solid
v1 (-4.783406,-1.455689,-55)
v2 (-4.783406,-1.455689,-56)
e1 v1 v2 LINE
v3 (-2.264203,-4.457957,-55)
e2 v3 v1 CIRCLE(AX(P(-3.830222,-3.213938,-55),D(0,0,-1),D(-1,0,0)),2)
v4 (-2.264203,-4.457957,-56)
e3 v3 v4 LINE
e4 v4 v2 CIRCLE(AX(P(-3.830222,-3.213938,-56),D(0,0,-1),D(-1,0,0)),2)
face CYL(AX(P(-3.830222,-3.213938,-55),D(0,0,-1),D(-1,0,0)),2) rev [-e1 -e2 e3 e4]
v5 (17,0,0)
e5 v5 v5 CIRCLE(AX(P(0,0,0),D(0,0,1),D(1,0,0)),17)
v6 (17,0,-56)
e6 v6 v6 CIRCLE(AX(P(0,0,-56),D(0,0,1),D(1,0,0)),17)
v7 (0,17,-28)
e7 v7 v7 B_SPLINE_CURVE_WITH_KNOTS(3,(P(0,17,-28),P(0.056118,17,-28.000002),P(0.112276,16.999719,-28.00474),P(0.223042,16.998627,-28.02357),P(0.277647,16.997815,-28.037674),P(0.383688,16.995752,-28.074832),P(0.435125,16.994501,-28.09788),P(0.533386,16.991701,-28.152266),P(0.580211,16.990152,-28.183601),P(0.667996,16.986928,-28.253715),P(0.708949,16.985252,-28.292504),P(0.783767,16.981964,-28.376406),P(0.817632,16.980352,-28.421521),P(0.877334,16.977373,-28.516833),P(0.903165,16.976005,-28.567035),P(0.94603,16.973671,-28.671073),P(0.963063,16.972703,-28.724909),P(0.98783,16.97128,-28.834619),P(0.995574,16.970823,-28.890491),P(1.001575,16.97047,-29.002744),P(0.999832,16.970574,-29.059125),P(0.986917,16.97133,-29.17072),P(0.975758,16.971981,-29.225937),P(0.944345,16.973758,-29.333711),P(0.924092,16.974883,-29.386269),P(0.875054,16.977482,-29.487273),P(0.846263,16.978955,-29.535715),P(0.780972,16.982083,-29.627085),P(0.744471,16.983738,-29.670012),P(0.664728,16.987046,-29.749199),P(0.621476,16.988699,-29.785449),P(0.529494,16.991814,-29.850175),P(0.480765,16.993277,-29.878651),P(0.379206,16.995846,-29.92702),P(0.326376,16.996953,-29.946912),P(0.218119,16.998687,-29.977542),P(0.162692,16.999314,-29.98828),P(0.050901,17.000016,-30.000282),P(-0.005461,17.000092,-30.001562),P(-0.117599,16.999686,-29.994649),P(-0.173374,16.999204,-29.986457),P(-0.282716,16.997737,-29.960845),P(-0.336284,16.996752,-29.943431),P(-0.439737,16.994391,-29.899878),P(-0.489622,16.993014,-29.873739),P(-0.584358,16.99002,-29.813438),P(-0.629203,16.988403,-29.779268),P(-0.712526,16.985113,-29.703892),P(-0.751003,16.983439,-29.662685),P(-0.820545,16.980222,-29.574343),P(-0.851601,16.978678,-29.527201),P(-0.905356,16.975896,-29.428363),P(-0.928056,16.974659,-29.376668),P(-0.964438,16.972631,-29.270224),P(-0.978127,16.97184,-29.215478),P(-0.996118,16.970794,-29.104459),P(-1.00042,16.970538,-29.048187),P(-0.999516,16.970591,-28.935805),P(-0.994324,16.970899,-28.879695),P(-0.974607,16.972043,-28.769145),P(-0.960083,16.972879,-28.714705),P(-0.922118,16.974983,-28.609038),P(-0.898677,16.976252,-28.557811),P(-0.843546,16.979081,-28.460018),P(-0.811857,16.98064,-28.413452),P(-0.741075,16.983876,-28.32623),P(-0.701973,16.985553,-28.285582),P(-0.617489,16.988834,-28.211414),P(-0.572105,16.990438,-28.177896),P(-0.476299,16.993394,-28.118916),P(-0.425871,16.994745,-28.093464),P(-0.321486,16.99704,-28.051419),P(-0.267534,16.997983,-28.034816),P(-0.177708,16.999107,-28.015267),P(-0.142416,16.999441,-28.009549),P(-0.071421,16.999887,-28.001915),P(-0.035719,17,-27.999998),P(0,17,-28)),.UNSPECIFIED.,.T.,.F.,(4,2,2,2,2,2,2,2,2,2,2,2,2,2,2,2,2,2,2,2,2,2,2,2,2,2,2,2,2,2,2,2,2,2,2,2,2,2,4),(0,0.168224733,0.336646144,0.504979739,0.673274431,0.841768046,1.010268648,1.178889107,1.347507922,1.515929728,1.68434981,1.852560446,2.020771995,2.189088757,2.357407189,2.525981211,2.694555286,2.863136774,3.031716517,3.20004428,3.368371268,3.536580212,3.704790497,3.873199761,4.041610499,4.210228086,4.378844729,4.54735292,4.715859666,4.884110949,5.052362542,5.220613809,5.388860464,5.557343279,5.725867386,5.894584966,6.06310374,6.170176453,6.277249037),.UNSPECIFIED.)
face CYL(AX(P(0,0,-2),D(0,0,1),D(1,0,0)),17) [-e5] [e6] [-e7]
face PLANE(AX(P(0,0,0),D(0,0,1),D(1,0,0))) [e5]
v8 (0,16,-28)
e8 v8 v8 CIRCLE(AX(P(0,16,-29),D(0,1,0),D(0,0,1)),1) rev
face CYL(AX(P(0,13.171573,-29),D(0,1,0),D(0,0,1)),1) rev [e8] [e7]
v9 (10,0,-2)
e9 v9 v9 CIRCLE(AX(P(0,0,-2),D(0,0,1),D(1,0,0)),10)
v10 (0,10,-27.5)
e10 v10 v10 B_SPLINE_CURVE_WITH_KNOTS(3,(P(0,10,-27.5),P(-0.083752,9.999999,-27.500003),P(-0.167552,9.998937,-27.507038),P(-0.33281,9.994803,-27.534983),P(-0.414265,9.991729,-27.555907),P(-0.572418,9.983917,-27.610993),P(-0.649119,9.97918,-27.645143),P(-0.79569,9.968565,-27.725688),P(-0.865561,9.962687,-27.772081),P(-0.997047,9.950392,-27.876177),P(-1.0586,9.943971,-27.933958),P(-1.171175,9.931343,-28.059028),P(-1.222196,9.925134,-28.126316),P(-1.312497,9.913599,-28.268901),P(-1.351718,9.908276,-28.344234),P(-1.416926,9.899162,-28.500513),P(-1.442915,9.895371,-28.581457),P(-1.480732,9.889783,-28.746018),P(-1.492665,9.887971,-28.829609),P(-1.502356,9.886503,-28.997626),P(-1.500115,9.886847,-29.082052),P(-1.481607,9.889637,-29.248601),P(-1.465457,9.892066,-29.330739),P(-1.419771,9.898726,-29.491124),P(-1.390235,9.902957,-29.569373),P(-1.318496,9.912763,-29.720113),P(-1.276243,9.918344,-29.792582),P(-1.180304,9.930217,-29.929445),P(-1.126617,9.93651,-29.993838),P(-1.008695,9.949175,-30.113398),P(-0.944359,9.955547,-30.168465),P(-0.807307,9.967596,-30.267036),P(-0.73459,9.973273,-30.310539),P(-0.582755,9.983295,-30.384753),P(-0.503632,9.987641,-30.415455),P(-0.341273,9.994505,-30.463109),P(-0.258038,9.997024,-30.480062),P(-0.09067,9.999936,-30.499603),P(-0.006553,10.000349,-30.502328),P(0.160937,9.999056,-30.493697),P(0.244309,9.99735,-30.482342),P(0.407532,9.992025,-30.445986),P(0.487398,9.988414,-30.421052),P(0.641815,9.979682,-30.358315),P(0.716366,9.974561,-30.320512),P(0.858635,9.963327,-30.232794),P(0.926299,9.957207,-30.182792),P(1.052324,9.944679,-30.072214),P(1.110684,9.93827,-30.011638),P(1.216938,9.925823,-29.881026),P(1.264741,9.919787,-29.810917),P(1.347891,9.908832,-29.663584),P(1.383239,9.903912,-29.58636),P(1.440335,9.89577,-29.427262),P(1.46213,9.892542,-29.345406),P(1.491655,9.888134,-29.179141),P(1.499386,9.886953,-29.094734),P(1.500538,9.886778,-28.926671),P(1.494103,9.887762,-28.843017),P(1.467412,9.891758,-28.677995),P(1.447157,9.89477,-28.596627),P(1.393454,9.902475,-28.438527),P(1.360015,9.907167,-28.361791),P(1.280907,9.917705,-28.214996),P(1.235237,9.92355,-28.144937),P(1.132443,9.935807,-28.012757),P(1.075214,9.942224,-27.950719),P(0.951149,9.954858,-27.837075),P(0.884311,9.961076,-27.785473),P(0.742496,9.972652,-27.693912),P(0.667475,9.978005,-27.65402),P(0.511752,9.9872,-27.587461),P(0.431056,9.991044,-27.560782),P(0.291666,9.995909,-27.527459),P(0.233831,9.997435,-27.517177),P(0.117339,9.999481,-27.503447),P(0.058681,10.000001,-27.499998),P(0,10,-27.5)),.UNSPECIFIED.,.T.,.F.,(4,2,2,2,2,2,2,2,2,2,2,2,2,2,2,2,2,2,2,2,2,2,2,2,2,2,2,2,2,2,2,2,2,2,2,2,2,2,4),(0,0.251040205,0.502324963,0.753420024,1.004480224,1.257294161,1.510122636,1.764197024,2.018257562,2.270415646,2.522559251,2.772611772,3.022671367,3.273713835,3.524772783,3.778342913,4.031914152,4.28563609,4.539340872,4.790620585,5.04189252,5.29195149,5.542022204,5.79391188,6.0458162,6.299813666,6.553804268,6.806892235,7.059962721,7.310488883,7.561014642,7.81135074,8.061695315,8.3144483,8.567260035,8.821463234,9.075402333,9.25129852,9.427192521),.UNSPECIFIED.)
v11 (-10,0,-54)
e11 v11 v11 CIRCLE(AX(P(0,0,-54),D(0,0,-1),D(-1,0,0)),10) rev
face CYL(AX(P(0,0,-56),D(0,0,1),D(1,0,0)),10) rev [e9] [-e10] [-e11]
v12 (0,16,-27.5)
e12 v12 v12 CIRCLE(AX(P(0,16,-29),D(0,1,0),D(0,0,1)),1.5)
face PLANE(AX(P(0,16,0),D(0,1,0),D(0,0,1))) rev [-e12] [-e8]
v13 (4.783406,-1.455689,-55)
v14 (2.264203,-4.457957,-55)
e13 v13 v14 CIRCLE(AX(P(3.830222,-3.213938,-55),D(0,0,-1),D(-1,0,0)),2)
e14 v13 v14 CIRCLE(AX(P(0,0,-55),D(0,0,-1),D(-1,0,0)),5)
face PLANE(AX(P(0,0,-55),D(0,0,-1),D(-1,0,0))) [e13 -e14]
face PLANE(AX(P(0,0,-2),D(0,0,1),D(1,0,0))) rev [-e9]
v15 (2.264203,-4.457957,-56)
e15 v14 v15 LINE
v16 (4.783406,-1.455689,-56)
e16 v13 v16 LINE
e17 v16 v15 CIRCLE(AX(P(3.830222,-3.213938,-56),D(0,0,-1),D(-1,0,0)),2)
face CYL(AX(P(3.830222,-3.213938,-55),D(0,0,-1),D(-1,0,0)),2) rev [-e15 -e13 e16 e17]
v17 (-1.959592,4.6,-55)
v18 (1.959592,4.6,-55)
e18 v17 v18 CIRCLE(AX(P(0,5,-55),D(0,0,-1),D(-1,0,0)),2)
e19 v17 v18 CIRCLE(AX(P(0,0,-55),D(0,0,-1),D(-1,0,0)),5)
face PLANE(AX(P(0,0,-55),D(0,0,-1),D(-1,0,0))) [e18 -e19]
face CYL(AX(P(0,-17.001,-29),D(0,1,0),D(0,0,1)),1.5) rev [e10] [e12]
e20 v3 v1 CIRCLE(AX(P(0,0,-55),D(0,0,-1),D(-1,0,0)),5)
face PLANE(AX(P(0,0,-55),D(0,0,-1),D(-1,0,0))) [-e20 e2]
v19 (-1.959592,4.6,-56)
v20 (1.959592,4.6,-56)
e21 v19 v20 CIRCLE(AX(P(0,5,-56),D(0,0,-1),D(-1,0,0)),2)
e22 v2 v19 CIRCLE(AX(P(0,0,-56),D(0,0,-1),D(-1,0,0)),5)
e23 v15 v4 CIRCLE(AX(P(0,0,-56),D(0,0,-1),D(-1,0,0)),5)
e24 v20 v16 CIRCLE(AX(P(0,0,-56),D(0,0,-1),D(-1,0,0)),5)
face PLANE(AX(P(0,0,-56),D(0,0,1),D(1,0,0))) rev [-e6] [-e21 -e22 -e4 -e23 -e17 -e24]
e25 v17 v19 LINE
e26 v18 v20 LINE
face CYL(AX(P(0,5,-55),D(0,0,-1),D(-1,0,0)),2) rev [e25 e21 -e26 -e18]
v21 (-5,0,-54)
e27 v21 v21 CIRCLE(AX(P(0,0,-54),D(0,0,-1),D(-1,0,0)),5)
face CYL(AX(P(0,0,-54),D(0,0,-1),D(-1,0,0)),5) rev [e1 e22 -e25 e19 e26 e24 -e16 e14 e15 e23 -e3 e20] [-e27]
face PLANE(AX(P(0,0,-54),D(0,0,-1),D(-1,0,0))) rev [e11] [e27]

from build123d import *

# Parameters (mm, degrees)
FACE_2_R                      = 17
BOSS_EXTRUDE5_DEPTH           = 2
BOSS_EXTRUDE6_START           = -56
BOSS_EXTRUDE6_OUTLINE_R       = 17
BOSS_EXTRUDE6_OUTLINE_R_2     = 10
BOSS_EXTRUDE6_DEPTH           = 54
DRIVER_PIN_BODY_CUT_START     = 9.886859906
DRIVER_PIN_BODY_CUT_OUTLINE_R = 1.5
DRIVER_PIN_BODY_CUT_DEPTH     = 6.113140094
SKETCH5_R                     = 10
SKETCH5_R_2                   = 5
BOSS_EXTRUDE7_DEPTH           = 2
DRIVER_PIN_SKETCH_R           = 1
DRIVER_PIN_SKETCH_R_2         = 0.15
DRIVER_PIN_NECK_EXTRUDE_DEPTH = 1
SKETCH5_6_R                   = 5
SKETCH5_6_R_2                 = 2
CUT_EXTRUDE1_DEPTH            = 1


# Read off the part's stored shape, not the designer's step: Boss-Extrude6, driver_pin_body_cut
with BuildPart() as part:
    # face 2 → Boss-Extrude5 (new body)
    with BuildSketch(Plane.XY):
        Circle(FACE_2_R)
    extrude(amount=-BOSS_EXTRUDE5_DEPTH)

    # Boss-Extrude6 outline → Boss-Extrude6 (add)
    with BuildSketch(Plane.XY.offset(BOSS_EXTRUDE6_START)):
        Circle(BOSS_EXTRUDE6_OUTLINE_R)
        Circle(BOSS_EXTRUDE6_OUTLINE_R_2, mode=Mode.SUBTRACT)
    extrude(amount=BOSS_EXTRUDE6_DEPTH)

    # driver_pin_body_cut outline → driver_pin_body_cut (cut)
    with BuildSketch(Plane(origin=(0, 0, 0), x_dir=(1, 0, 0), z_dir=(0, 1, 0)).offset(DRIVER_PIN_BODY_CUT_START)):
        with Locations((0, 29)):
            Circle(DRIVER_PIN_BODY_CUT_OUTLINE_R)
    extrude(amount=DRIVER_PIN_BODY_CUT_DEPTH, mode=Mode.SUBTRACT)

    # Sketch5 → Boss-Extrude7 (add)
    with BuildSketch(Plane(origin=(0, 0, -56), x_dir=(-1, 0, 0), z_dir=(0, 0, -1))):
        with Locations(Location((0, 0, 0), (0, 0, 180))):
            Circle(SKETCH5_R)
        Circle(SKETCH5_R_2, mode=Mode.SUBTRACT)
    extrude(amount=-BOSS_EXTRUDE7_DEPTH)

    # driver_pin_sketch → driver_pin_neck_extrude (cut)
    # profile 1 of 2: a face of its own
    with BuildSketch(Plane(origin=(0, 17, 0), x_dir=(1, 0, 0), z_dir=(0, 1, 0))):
        with Locations(Location((0, 29, 0), (0, 0, 270))):
            Circle(DRIVER_PIN_SKETCH_R)
        with Locations((0, 29)):
            Circle(DRIVER_PIN_SKETCH_R_2, mode=Mode.SUBTRACT)
    # profile 2 of 2: a face of its own
    with BuildSketch(Plane(origin=(0, 17, 0), x_dir=(1, 0, 0), z_dir=(0, 1, 0))):
        with Locations((0, 29)):
            Circle(DRIVER_PIN_SKETCH_R_2)
    extrude(amount=-DRIVER_PIN_NECK_EXTRUDE_DEPTH, mode=Mode.SUBTRACT)

    # Sketch5<6> → Cut-Extrude1 (cut)
    with BuildSketch(Plane(origin=(0, 0, -56), x_dir=(-1, 0, 0), z_dir=(0, 0, -1))):
        Circle(SKETCH5_6_R)
        with Locations((3.830222216, -3.213938048)):
            Circle(SKETCH5_6_R_2)
        with Locations((-3.830222216, -3.213938048)):
            Circle(SKETCH5_6_R_2)
        with Locations((0, 5)):
            Circle(SKETCH5_6_R_2)
    extrude(amount=-CUT_EXTRUDE1_DEPTH, mode=Mode.SUBTRACT)


solid = part.part
